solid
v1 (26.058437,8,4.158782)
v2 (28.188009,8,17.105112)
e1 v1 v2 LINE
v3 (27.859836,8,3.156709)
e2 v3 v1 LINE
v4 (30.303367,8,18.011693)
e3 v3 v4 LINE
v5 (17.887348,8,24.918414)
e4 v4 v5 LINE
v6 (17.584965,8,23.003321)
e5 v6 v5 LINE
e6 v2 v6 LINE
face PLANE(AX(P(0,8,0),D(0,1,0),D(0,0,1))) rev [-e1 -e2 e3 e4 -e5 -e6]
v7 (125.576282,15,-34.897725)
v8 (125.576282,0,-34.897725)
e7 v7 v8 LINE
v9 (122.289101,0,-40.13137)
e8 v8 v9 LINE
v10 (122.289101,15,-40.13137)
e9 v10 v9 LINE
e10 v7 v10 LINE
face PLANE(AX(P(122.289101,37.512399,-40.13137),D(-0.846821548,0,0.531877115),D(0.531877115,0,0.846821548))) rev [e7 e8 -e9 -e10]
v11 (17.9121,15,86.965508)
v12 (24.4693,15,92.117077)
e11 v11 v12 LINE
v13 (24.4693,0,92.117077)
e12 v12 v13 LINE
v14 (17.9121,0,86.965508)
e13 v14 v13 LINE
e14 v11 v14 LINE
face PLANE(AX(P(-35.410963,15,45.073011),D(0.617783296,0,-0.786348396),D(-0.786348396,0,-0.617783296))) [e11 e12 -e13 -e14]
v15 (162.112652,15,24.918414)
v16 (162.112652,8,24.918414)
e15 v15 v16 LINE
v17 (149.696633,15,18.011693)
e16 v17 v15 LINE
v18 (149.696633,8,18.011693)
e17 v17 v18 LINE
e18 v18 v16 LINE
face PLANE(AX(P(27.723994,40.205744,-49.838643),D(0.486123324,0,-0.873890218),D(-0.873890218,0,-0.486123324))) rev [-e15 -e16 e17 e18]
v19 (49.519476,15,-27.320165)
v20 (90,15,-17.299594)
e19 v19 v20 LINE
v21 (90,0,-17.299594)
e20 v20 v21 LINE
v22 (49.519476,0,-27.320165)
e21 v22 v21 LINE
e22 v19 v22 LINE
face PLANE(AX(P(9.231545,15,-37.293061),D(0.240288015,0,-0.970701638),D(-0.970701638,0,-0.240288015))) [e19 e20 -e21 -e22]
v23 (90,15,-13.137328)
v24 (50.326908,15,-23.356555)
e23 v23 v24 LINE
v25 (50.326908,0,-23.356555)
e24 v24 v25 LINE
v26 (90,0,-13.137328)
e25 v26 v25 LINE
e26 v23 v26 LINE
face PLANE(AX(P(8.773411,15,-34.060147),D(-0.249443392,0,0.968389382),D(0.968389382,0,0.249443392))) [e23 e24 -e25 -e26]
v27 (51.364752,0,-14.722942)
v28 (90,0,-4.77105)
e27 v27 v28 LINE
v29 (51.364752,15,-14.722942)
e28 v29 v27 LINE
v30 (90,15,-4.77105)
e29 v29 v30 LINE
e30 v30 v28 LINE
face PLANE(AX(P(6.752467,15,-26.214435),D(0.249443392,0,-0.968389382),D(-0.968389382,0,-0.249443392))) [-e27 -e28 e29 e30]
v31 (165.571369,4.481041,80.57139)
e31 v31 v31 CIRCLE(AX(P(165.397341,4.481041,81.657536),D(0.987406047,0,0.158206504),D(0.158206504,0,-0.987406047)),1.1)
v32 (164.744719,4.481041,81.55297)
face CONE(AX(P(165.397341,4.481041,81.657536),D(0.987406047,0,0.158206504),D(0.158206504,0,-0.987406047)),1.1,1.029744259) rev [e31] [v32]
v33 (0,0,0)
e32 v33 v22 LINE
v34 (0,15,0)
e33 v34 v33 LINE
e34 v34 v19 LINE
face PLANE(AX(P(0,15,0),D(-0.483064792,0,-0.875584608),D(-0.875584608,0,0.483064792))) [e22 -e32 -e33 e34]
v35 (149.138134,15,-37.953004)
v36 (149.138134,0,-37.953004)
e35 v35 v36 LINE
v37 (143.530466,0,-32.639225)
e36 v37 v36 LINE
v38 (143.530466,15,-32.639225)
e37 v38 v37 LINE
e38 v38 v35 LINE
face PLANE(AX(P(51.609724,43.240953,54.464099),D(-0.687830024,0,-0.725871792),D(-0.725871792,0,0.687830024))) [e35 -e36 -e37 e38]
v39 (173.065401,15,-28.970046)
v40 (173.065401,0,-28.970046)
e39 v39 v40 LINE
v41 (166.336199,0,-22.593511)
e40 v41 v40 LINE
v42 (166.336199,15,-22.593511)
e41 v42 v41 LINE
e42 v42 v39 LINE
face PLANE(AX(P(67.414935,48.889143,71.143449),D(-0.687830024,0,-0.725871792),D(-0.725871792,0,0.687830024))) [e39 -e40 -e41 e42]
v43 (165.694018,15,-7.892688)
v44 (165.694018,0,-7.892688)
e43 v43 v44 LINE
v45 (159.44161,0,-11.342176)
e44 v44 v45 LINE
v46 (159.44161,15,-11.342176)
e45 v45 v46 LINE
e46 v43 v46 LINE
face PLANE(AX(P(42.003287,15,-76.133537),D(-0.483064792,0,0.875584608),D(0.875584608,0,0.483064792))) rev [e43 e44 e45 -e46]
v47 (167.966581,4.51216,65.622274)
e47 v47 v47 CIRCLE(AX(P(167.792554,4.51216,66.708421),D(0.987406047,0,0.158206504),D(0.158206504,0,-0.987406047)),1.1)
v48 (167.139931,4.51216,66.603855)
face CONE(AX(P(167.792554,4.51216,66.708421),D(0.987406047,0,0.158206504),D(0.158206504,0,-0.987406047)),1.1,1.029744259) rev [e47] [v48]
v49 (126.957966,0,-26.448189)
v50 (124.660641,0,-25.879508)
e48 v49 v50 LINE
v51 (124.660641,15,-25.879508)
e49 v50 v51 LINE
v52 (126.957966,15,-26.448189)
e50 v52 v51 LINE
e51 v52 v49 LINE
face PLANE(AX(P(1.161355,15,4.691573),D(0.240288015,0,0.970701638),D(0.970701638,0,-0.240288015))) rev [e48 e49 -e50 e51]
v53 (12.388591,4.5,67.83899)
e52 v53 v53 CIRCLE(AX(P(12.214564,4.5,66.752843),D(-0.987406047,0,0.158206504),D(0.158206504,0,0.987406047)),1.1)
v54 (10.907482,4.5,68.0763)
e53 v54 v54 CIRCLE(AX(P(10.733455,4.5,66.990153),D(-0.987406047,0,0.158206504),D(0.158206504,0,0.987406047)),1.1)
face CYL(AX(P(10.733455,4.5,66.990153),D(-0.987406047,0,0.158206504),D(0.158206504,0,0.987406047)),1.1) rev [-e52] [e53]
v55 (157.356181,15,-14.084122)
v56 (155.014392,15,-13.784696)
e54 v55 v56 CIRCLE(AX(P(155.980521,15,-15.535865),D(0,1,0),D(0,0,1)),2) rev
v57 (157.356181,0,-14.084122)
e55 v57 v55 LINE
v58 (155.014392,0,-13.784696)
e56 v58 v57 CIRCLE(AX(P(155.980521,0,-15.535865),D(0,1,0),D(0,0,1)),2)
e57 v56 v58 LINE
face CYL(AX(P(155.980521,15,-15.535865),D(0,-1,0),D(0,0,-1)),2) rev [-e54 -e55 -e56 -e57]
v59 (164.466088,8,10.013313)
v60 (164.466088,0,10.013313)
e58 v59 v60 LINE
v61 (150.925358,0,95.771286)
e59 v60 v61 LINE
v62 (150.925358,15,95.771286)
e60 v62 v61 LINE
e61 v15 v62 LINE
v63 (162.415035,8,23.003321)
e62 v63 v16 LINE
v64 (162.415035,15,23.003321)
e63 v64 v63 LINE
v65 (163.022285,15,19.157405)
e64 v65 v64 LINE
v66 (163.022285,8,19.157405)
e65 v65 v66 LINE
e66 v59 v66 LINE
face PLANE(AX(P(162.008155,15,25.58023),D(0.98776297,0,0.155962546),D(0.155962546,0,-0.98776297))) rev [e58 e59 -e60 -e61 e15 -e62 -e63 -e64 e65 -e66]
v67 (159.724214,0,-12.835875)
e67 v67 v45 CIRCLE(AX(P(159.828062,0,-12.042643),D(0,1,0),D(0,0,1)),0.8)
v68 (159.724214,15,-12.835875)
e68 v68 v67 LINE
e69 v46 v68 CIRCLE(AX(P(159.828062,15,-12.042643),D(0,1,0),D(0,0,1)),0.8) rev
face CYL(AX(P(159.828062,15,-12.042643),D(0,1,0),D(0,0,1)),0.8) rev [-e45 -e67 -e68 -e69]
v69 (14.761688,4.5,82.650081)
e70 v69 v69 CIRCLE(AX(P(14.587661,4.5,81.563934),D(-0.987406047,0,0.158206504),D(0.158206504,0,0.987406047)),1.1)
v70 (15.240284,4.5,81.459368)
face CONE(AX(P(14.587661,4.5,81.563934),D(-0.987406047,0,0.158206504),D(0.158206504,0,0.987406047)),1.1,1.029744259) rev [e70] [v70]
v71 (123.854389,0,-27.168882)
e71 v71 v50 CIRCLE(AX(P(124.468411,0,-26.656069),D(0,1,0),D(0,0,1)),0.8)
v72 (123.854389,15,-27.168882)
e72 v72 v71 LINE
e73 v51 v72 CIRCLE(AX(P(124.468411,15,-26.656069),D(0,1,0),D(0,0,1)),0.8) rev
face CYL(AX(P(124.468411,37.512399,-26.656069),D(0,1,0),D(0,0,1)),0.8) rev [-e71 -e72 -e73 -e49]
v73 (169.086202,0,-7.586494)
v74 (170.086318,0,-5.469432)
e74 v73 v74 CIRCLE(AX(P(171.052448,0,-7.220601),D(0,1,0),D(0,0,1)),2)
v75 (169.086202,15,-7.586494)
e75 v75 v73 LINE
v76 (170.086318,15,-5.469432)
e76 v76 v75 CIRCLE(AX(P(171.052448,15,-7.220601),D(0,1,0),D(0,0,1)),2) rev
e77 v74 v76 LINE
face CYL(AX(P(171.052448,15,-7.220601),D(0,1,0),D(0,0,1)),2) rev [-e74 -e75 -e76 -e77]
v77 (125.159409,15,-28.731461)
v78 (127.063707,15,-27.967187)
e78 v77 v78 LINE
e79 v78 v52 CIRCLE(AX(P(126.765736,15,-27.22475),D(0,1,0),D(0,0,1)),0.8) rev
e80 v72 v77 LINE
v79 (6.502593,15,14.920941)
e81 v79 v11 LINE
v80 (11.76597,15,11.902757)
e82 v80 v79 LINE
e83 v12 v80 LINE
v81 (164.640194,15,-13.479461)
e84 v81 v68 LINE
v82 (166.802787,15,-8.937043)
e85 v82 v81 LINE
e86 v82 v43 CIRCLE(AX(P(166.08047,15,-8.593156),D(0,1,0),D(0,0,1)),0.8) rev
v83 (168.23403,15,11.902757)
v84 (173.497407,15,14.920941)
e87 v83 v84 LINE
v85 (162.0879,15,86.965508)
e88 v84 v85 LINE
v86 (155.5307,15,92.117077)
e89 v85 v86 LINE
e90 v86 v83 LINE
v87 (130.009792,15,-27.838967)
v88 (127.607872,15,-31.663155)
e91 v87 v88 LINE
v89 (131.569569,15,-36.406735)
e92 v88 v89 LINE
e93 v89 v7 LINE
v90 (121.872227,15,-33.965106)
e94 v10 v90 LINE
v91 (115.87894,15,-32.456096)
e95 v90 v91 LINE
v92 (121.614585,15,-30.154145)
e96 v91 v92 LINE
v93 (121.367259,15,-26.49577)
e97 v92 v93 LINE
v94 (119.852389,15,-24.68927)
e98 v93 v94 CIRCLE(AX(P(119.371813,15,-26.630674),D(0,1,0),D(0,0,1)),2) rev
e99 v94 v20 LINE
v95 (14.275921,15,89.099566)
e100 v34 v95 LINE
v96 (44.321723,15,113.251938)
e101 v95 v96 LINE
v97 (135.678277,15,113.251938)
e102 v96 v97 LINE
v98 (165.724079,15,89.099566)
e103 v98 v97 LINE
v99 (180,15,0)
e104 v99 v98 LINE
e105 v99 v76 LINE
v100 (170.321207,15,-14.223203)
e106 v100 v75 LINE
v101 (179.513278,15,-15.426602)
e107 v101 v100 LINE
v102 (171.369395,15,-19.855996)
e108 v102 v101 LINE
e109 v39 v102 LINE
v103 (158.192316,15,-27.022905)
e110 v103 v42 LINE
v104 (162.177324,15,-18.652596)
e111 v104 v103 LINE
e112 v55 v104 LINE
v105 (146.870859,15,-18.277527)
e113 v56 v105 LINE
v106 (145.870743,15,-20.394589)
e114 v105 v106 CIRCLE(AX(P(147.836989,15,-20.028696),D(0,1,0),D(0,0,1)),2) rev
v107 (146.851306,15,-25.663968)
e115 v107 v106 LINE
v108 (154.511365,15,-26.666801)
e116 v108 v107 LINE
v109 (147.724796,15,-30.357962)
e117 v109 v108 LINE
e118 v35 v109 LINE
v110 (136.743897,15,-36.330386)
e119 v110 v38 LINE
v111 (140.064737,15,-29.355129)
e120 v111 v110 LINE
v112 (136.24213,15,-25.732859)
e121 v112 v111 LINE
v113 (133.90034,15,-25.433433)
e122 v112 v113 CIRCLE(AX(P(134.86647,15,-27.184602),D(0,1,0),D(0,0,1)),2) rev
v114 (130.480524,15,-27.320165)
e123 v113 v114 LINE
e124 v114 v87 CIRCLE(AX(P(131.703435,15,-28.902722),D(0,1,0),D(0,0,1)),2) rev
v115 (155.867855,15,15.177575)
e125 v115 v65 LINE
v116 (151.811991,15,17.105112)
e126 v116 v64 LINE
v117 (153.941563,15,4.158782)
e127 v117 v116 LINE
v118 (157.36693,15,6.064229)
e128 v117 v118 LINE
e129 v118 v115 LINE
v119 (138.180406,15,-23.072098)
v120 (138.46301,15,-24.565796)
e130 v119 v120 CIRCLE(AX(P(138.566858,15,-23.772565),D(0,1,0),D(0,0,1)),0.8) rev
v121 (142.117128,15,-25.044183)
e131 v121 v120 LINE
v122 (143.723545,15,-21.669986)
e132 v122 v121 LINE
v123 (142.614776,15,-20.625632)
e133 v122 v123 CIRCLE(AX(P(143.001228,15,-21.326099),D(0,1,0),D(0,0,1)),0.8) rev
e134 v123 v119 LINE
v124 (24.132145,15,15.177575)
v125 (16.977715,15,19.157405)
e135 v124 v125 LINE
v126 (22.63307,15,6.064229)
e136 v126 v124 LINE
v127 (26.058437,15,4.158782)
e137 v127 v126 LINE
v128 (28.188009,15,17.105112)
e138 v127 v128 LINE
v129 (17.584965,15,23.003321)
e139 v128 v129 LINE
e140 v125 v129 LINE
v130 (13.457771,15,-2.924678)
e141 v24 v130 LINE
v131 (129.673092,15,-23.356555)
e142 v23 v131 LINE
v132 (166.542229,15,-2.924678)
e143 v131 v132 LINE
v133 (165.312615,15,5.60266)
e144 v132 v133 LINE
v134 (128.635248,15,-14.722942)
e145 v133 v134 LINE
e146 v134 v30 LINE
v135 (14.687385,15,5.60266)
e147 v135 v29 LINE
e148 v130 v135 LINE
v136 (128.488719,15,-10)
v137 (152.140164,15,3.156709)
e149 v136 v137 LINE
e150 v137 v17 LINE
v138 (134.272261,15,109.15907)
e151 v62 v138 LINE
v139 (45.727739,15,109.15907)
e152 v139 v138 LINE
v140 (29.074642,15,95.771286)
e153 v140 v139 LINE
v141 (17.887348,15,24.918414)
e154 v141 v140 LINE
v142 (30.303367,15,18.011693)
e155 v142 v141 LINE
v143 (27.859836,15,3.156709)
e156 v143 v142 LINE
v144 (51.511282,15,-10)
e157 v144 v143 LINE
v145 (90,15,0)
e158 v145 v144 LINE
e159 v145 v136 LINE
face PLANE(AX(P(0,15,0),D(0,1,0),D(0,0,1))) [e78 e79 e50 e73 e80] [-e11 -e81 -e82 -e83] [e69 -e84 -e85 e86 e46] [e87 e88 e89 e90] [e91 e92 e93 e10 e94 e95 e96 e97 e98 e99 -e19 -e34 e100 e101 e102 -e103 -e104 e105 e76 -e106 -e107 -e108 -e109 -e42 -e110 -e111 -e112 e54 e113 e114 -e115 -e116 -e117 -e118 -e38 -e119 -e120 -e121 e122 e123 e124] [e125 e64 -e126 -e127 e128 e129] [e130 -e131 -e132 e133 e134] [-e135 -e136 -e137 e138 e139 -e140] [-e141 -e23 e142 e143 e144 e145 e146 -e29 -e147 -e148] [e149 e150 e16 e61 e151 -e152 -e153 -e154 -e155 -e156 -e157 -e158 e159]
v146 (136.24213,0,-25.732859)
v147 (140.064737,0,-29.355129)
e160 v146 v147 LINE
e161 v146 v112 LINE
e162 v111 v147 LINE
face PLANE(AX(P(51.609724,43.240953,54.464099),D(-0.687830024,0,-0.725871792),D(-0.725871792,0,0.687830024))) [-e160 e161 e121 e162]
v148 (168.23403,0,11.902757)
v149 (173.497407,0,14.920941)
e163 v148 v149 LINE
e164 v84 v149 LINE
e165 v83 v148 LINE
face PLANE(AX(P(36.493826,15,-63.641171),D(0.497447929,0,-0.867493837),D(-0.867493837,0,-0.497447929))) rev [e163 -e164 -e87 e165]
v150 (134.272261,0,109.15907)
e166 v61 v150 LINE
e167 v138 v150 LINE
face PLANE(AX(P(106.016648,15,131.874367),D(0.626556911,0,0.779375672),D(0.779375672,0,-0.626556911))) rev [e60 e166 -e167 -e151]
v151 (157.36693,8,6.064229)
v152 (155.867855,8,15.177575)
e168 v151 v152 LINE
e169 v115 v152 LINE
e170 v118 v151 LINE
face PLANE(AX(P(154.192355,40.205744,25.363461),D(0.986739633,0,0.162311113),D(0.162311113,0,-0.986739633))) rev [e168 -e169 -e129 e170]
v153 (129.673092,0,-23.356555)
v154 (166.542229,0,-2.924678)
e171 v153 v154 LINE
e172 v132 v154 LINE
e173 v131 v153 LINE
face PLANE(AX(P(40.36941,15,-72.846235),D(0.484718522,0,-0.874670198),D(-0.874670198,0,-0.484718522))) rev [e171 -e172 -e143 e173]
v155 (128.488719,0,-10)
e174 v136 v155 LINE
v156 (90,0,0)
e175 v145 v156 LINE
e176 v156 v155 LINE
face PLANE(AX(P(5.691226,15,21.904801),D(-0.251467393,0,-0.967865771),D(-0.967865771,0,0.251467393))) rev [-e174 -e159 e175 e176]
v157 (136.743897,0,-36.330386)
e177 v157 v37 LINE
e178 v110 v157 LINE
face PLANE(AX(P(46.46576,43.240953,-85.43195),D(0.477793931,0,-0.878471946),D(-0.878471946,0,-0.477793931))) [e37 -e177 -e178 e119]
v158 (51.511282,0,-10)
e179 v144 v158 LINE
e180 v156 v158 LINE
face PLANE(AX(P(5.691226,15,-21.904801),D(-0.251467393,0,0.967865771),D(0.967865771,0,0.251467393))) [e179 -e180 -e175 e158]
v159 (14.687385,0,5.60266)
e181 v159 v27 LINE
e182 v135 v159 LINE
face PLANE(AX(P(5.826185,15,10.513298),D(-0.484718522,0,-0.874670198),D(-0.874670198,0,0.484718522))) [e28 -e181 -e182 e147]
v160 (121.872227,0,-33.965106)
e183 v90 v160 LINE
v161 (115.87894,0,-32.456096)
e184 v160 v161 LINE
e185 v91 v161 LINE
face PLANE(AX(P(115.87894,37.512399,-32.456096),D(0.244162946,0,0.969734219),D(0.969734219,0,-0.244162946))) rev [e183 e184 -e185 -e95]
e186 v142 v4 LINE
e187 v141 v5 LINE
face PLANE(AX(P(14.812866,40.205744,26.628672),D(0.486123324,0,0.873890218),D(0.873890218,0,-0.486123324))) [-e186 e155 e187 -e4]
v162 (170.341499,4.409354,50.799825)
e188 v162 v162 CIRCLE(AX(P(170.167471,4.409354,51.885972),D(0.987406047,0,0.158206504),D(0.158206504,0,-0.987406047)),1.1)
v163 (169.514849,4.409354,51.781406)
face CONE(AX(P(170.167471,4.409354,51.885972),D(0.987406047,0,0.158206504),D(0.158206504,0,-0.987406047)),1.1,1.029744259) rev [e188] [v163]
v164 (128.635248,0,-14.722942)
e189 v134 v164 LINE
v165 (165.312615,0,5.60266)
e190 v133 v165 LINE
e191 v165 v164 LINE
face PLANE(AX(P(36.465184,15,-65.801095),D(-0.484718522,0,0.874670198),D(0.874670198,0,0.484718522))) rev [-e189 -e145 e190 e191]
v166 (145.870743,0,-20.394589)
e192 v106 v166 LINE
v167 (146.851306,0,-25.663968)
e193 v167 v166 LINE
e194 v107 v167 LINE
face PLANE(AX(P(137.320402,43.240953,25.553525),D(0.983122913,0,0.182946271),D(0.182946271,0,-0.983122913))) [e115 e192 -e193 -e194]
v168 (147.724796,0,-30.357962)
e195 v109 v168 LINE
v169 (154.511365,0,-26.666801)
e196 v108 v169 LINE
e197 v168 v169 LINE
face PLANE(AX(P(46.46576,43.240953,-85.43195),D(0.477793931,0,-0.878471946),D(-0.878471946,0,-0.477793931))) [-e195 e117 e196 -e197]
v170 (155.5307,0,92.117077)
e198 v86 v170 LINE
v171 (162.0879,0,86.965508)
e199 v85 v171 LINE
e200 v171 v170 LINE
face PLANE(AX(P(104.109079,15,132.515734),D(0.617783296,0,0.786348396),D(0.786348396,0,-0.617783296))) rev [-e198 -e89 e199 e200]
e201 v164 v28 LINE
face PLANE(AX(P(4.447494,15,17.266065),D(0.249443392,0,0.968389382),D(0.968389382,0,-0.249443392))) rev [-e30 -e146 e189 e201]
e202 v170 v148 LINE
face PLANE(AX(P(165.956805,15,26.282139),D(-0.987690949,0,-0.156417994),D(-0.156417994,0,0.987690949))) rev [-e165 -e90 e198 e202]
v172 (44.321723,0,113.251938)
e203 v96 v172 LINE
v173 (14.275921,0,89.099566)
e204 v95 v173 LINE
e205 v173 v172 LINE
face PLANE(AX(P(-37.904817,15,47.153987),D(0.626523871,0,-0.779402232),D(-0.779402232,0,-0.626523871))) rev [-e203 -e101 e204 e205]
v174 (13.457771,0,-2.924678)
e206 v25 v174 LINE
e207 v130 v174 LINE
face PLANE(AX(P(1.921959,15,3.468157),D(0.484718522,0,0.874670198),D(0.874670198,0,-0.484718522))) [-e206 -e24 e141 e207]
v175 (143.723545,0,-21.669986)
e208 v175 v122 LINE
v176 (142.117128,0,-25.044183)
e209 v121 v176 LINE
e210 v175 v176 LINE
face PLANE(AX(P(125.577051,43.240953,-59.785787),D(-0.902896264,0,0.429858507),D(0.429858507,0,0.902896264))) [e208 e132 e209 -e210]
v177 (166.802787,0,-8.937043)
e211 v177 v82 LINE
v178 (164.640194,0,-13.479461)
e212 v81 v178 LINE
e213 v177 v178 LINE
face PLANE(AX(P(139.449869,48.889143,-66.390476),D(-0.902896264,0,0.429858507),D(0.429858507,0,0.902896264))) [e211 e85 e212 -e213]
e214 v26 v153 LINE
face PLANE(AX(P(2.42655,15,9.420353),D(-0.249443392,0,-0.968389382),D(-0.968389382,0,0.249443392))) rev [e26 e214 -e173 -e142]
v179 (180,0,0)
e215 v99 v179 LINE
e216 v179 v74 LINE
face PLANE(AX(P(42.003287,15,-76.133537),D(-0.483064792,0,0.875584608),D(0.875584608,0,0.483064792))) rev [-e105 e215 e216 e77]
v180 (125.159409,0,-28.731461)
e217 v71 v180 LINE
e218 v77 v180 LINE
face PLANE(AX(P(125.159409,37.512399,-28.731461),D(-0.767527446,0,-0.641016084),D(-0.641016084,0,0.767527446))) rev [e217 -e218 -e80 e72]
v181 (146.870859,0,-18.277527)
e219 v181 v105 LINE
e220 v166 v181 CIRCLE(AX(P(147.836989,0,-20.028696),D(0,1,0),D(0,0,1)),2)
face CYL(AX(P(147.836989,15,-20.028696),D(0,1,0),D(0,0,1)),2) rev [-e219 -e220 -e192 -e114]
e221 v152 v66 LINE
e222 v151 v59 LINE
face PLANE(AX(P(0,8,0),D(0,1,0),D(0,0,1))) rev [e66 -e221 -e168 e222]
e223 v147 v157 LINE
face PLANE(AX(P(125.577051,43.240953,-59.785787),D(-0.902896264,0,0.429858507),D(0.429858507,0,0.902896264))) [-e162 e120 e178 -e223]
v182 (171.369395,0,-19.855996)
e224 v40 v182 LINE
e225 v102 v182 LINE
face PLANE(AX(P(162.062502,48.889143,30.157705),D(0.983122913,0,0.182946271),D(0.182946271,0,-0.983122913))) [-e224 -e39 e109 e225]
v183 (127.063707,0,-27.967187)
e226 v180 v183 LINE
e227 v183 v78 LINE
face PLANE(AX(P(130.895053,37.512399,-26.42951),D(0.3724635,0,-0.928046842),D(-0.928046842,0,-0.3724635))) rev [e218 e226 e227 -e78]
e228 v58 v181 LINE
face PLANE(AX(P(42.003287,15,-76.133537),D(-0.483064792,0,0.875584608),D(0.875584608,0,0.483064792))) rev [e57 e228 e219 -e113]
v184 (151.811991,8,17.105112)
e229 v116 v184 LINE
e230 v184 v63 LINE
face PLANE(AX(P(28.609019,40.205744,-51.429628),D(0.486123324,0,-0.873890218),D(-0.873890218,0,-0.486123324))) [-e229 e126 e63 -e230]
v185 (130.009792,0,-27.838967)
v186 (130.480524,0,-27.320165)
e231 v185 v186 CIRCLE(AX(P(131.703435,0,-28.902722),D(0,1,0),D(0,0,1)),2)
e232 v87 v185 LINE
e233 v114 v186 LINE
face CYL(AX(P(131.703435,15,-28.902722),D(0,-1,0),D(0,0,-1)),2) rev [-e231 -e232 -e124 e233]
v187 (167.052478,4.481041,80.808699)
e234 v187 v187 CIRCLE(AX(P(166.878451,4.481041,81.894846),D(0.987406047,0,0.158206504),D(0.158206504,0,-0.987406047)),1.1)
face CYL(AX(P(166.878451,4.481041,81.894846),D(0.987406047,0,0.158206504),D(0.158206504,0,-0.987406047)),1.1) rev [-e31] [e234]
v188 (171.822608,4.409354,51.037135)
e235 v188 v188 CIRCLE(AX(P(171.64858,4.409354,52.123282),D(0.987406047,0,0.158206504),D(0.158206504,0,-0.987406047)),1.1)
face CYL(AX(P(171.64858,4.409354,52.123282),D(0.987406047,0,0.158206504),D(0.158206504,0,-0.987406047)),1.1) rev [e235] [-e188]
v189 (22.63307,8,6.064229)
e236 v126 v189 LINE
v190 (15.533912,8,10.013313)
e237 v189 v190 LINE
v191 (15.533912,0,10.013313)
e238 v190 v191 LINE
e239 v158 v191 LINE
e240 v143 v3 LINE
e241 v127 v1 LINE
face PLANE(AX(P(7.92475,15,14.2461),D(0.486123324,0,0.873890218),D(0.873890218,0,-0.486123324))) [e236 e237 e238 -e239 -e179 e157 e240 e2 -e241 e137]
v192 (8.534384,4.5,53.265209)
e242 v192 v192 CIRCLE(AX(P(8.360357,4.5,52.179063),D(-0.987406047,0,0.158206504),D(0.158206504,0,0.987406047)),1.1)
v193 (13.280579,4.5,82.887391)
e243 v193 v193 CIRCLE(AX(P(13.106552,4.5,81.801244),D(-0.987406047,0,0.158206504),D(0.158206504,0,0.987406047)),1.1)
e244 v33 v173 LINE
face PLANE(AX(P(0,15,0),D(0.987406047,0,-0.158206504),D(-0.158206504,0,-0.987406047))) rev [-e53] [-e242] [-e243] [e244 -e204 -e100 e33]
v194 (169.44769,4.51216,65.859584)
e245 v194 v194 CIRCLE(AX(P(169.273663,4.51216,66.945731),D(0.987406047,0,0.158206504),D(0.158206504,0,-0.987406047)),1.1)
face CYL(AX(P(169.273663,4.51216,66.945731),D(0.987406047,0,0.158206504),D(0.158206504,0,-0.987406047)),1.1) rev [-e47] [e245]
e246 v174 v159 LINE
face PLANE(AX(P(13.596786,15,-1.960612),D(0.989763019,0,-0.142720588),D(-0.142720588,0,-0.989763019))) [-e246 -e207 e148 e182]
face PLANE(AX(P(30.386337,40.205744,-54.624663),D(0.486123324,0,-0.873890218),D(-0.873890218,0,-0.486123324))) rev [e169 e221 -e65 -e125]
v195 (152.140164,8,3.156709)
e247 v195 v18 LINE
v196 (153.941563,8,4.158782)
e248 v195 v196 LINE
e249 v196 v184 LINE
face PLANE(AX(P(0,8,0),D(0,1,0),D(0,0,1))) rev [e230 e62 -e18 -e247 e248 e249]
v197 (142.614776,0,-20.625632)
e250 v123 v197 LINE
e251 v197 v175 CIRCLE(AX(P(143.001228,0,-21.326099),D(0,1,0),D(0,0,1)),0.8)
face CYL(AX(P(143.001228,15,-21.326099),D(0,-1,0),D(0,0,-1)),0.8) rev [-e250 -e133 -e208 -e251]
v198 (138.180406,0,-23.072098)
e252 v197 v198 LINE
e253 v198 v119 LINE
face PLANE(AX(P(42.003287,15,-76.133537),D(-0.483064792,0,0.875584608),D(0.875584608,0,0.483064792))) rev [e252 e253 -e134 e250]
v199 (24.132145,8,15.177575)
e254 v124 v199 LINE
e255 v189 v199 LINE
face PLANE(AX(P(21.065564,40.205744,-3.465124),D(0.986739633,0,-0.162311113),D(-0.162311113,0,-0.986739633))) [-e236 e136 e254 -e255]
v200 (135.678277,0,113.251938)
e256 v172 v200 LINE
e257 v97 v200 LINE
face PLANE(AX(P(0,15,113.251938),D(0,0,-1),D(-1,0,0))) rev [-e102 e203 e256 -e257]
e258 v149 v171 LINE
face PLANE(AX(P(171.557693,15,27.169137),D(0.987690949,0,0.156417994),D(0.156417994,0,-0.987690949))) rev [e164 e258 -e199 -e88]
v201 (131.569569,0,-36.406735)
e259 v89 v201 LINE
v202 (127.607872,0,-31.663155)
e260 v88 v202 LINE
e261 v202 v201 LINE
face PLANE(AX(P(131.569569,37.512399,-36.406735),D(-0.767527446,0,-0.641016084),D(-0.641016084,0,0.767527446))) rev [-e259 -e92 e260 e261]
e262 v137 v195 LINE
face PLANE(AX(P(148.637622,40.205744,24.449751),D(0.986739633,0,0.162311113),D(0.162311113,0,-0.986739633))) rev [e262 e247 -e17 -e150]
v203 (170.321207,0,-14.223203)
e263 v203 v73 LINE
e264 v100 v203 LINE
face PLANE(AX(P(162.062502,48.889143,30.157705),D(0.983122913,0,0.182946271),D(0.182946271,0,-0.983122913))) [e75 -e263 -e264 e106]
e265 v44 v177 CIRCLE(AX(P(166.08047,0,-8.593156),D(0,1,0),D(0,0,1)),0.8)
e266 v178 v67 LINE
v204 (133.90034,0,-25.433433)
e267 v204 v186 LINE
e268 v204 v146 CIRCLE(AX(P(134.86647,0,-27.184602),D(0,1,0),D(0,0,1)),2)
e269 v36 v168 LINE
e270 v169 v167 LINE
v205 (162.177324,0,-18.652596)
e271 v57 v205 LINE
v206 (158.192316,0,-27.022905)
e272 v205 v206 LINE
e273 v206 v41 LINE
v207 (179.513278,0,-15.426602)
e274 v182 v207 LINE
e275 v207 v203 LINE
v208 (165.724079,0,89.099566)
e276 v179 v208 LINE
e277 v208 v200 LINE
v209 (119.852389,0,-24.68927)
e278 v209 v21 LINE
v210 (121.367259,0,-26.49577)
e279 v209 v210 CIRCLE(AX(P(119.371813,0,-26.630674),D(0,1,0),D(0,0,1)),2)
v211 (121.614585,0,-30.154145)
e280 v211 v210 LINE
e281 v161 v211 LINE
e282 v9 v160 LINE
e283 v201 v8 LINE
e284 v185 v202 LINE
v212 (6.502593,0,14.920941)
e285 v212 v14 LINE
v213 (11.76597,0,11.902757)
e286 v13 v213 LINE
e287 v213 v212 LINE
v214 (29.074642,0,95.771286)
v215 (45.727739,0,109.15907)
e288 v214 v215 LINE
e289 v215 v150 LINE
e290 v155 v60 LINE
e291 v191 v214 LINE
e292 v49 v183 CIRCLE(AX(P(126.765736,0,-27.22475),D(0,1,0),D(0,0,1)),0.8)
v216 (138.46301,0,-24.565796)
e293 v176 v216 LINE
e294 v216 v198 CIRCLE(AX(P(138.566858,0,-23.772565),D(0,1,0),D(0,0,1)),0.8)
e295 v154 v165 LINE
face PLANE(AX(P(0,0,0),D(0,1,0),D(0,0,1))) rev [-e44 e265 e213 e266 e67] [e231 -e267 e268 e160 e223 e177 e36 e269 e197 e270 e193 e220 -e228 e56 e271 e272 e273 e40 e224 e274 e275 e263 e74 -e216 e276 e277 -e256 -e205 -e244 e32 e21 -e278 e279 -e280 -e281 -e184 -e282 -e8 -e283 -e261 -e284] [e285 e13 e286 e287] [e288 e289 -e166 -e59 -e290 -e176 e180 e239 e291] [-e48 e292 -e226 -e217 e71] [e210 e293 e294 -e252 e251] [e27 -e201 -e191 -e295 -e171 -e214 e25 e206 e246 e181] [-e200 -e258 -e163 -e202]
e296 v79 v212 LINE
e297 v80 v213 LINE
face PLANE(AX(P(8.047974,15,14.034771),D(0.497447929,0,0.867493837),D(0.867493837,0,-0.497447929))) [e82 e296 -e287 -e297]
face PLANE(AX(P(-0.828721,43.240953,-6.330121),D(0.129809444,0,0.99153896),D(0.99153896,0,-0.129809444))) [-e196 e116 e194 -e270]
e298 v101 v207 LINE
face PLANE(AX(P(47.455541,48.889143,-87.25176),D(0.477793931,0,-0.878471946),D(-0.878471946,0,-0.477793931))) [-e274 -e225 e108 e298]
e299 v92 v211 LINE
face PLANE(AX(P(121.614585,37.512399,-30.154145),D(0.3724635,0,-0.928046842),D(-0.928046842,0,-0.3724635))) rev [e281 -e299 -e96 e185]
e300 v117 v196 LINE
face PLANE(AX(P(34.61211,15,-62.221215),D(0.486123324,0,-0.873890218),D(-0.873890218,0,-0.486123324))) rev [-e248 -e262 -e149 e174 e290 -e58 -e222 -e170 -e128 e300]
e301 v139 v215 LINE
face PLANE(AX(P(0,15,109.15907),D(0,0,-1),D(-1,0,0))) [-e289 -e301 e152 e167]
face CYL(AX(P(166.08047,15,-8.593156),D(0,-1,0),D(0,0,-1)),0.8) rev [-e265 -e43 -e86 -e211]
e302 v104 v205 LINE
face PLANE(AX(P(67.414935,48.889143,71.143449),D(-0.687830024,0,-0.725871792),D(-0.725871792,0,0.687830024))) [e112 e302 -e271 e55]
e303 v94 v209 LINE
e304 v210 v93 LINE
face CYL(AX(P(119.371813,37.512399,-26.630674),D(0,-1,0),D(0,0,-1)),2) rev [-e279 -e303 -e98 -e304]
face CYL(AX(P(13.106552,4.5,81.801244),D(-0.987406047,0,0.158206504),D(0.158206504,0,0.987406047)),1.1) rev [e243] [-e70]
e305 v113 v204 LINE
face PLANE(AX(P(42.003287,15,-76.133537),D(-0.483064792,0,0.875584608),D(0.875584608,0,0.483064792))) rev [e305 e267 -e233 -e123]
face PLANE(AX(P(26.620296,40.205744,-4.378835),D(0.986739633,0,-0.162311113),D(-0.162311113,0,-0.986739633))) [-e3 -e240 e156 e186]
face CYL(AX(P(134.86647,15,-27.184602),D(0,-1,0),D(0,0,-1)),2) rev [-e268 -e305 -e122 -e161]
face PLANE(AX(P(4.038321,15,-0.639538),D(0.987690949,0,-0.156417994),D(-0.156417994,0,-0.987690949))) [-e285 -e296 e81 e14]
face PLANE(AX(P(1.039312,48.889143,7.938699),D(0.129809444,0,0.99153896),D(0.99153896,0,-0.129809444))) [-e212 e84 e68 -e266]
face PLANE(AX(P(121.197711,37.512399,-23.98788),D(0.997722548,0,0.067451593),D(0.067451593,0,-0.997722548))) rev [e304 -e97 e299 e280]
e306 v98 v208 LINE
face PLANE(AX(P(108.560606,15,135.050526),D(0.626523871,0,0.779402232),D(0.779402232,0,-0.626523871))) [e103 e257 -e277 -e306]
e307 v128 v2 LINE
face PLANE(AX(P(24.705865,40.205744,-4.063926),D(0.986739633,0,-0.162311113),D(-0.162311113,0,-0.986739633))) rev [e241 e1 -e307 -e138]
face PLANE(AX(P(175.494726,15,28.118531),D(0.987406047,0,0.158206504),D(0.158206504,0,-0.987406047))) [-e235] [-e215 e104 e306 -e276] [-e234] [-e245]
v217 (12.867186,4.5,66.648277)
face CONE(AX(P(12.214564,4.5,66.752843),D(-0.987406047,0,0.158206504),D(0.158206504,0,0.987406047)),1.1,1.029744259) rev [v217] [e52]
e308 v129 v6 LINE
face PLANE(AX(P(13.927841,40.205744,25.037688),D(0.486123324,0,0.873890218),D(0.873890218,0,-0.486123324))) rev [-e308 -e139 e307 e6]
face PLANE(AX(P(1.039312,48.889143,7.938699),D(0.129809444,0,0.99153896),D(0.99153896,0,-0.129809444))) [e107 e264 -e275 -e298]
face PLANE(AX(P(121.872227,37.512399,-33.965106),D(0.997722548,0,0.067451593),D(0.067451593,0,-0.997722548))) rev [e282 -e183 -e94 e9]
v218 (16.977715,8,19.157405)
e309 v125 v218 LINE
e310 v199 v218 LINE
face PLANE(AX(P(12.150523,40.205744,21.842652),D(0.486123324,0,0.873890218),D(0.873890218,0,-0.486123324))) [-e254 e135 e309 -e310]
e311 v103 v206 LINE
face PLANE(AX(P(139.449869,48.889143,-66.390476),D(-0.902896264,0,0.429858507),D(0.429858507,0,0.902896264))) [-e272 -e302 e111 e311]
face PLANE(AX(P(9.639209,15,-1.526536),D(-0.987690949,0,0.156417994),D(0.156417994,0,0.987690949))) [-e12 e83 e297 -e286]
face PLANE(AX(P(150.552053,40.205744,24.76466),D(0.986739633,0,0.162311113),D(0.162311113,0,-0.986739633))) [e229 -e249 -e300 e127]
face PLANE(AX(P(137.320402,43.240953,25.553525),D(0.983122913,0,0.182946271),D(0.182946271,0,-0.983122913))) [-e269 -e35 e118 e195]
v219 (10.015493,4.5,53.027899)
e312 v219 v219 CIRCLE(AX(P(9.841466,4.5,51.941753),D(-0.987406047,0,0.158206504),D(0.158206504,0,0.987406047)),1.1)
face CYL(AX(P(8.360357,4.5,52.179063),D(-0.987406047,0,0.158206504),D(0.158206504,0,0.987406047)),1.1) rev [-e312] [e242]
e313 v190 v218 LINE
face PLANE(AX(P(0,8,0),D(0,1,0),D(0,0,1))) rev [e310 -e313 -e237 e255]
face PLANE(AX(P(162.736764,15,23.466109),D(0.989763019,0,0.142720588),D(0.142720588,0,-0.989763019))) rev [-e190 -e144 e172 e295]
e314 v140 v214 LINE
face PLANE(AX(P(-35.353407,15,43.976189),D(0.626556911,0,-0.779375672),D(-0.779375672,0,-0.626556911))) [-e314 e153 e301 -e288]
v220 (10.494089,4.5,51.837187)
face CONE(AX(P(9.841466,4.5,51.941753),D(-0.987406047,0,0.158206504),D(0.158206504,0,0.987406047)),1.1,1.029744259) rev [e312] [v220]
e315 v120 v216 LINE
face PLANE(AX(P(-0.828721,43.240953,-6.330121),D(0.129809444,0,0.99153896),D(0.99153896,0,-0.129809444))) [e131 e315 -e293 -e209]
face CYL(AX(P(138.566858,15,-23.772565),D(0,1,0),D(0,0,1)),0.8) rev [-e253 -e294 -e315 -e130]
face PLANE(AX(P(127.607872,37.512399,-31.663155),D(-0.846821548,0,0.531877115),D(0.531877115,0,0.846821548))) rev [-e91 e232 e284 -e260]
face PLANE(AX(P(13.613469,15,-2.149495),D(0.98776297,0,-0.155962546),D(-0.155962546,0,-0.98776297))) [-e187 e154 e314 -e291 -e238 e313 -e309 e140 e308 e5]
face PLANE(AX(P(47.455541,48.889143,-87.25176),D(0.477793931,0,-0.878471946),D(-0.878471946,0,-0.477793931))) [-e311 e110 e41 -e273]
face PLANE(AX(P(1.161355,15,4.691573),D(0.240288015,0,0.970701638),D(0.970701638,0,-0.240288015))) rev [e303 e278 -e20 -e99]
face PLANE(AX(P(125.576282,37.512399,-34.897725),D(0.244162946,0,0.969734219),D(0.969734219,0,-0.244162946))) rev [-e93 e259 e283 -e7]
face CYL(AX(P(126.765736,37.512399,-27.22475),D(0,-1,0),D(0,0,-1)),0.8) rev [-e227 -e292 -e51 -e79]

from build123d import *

# Parameters (mm, degrees)
EXTRUDE_1_DEPTH = 15
EXTRUDE_START   = 8
EXTRUDE_3_DEPTH = 7
EXTRUDE_4_DEPTH = 15
EXTRUDE_5_DEPTH = 15
EXTRUDE_6_DEPTH = 15
FILLET_1_R      = 2
FILLET_2_R      = 0.8
F_2_0MM_1_D     = 2.2
F_2_0MM_1_DEPTH = 1.5
F_2_0MM_1_TIP   = 0.660946681
F_2_0MM_2_D     = 2.2
F_2_0MM_2_DEPTH = 1.5
F_2_0MM_2_TIP   = 0.660946681


with BuildPart() as part:
    # 草图1 → 凸台-拉伸1 (new body)
    with BuildSketch(Plane(origin=(0, 0, 0), x_dir=(1, 0, 0), z_dir=(0, 1, 0))):
        Polygon((49.5194763, 27.3201645), (0, 0), (14.2759212, -89.0995664), (44.3217232, -113.2519378), (135.6782768, -113.2519378), (165.7240788, -89.0995664), (180, 0), (130.4805237, 27.3201645), (90, 17.2995935), align=None)
        Polygon((6.502592683, -14.920940874), (11.7659704, -11.9027565), (24.4692995, -92.1170773), (17.9120995, -86.965507524), align=None, mode=Mode.SUBTRACT)
        Polygon((51.5112815, 10), (90, 0), (128.4887185, 10), (152.140164487, -3.156709279), (153.941562556, -4.158782079), (157.3669305, -6.0642288), (164.466088374, -10.013313195), (163.0222846, -19.1574054), (162.41503493, -23.003320662), (162.112651759, -24.918414423), (150.9253582, -95.7712863), (134.2722611, -109.1590702), (45.7277389, -109.1590702), (29.0746418, -95.7712863), (17.887348241, -24.918414423), (17.58496507, -23.003320662), (16.9777154, -19.1574054), (15.533911626, -10.013313195), (22.6330695, -6.0642288), (26.058437444, -4.158782079), (27.859835513, -3.156709279), align=None, mode=Mode.SUBTRACT)
        Polygon((162.0879005, -86.965507524), (155.5307005, -92.1170773), (168.2340296, -11.9027565), (173.497407317, -14.920940874), align=None, mode=Mode.SUBTRACT)
        Polygon((50.326908, 23.3565545), (90, 13.1373278), (129.673092, 23.3565545), (166.5422291, 2.924677806), (165.312614852, -5.602660324), (128.635248263, 14.72294235), (90, 4.7710495), (51.364751737, 14.72294235), (14.687385148, -5.602660324), (13.4577709, 2.924677806), align=None, mode=Mode.SUBTRACT)
    extrude(amount=EXTRUDE_1_DEPTH)

    # 草图1<4> → 凸台-拉伸3 (add)
    with BuildSketch(Plane(origin=(0, 0, 0), x_dir=(1, 0, 0), z_dir=(0, 1, 0)).offset(EXTRUDE_START)):
        Polygon((164.466088374, -10.013313195), (163.0222846, -19.1574054), (155.8678549, -15.177574667), (157.3669305, -6.0642288), align=None)
        Polygon((153.941562556, -4.158782079), (152.140164487, -3.156709279), (149.6966334, -18.0116932), (162.112651759, -24.918414423), (162.41503493, -23.003320662), (151.8119905, -17.1051116), align=None)
        Polygon((22.6330695, -6.0642288), (15.533911626, -10.013313195), (16.9777154, -19.1574054), (24.1321451, -15.177574667), align=None)
        Polygon((30.3033666, -18.0116932), (27.859835513, -3.156709279), (26.058437444, -4.158782079), (28.1880095, -17.1051116), (17.58496507, -23.003320662), (17.887348241, -24.918414423), align=None)
    extrude(amount=EXTRUDE_3_DEPTH)

    # 草图3 → 凸台-拉伸4 (add)
    with BuildSketch(Plane(origin=(0, 0, 0), x_dir=(1, 0, 0), z_dir=(0, 1, 0))):
        Polygon((115.878940082, 32.456095876), (121.872227157, 33.965105872), (122.289100924, 40.131370332), (125.576282273, 34.897725339), (131.569569347, 36.406735336), (127.607872073, 31.663154849), (130.895053422, 26.429509857), (125.159408505, 28.73146088), (121.197711231, 23.987880393), (121.614584999, 30.154144853), align=None)
    extrude(amount=EXTRUDE_4_DEPTH)

    # 草图4 → 凸台-拉伸5 (add)
    with BuildSketch(Plane(origin=(0, 0, 0), x_dir=(1, 0, 0), z_dir=(0, 1, 0))):
        Polygon((168.625201424, 5.109151957), (158.192316311, 27.022904619), (179.513278304, 15.426602313), (155.448122239, 12.276060926), (173.065400703, 28.970046279), align=None)
        Polygon((173.065400703, 28.970046279), (166.336199119, 22.593511282), (171.369395495, 19.85599565), align=None)
        Polygon((179.513278304, 15.426602313), (171.369395495, 19.85599565), (170.321206632, 14.223202586), align=None)
        Polygon((170.321206632, 14.223202586), (164.640193911, 13.479460653), (168.625201424, 5.109151957), align=None)
        Polygon((164.640193911, 13.479460653), (162.177323823, 18.652595923), (155.448122239, 12.276060926), align=None)
        Polygon((166.336199119, 22.593511282), (158.192316311, 27.022904619), (162.177323823, 18.652595923), align=None)
    extrude(amount=EXTRUDE_5_DEPTH)

    # 草图5 → 凸台-拉伸6 (add)
    with BuildSketch(Plane(origin=(0, 0, 0), x_dir=(1, 0, 0), z_dir=(0, 1, 0))):
        Polygon((145.437967888, 18.068925838), (136.74389696, 36.330386388), (154.511365288, 26.666801134), (134.457068567, 24.041349978), (149.138133954, 37.953004439), align=None)
        Polygon((143.530465967, 32.639225275), (136.74389696, 36.330386388), (140.064736554, 29.355129142), align=None)
        Polygon((149.138133954, 37.953004439), (143.530465967, 32.639225275), (147.724796281, 30.357962248), align=None)
        Polygon((154.511365288, 26.666801134), (147.724796281, 30.357962248), (146.851305561, 25.663968028), align=None)
        Polygon((146.851305561, 25.663968028), (142.117128294, 25.044183084), (145.437967888, 18.068925838), align=None)
        Polygon((142.117128294, 25.044183084), (140.064736554, 29.355129142), (134.457068567, 24.041349978), align=None)
    extrude(amount=EXTRUDE_6_DEPTH)

    # 圆角1
    # the kernel refuses this fillet: 2 mm, written as the material it adds along each edge
    with BuildSketch(Plane(origin=(121.268833448, 15, -25.039897652), x_dir=(-0.9707016379334082, 0, 0.2402880149183444), z_dir=(0, -1, 0))) as fillet_1_piece_1:
        with BuildLine():
            CenterArc((FILLET_1_R * 0.72959801192, FILLET_1_R), FILLET_1_R, 197.771167986, 72.228832014)
            Line((-FILLET_1_R * 0.222685090293, FILLET_1_R * 0.69478385816), (-FILLET_1_R * 0.241730752337, FILLET_1_R * 0.688679535323))
            Line((-FILLET_1_R * 0.241730752337, FILLET_1_R * 0.688679535323), (-FILLET_1_R * 0.0145919602384, -FILLET_1_R * 0.02))
            Line((-FILLET_1_R * 0.0145919602384, -FILLET_1_R * 0.02), (FILLET_1_R * 0.72959801192, -FILLET_1_R * 0.02))
            Line((FILLET_1_R * 0.72959801192, -FILLET_1_R * 0.02), (FILLET_1_R * 0.72959801192, 0))
        make_face()
    extrude(amount=15)
    with BuildSketch(Plane(origin=(130.355139653, 0, -27.289126864), x_dir=(-0.5318771148973955, 0, -0.8468215482900885), z_dir=(0, 1, 0))) as fillet_1_piece_2:
        with BuildLine():
            CenterArc((0.649299153, -2), FILLET_1_R, 90, 20.172783533)
            Line((-0.040405567, -0.122686121), (-0.054199661, -0.085139844))
            ThreePointArc((-0.054199661, -0.085139844), (-0.058195374, -0.048830544), (-0.03799259, 0.012512517))
            Line((-0.03799259, 0.012512517), (0, 0.04))
            Line((0, 0.04), (0.649299153, 0.04))
            Line((0.649299153, 0.04), (0.649299153, 0))
        make_face()
    extrude(amount=15)
    with BuildSketch(Plane(origin=(168.822041947, 0, -6.166940275), x_dir=(0.18294627145075168, 0, -0.9831229128457274), z_dir=(0, 1, 0))) as fillet_1_piece_3:
        with BuildLine():
            CenterArc((FILLET_1_R * 0.721961366951, -FILLET_1_R), FILLET_1_R, 90, 71.655658553)
            Line((-FILLET_1_R * 0.227220826301, -FILLET_1_R * 0.685272873726), (-FILLET_1_R * 0.246204470166, -FILLET_1_R * 0.678978331201))
            Line((-FILLET_1_R * 0.246204470166, -FILLET_1_R * 0.678978331201), (-FILLET_1_R * 0.014439227339, FILLET_1_R * 0.02))
            Line((-FILLET_1_R * 0.014439227339, FILLET_1_R * 0.02), (FILLET_1_R * 0.721961366951, FILLET_1_R * 0.02))
            Line((FILLET_1_R * 0.721961366951, FILLET_1_R * 0.02), (FILLET_1_R * 0.721961366951, 0))
        make_face()
    extrude(amount=15)
    with BuildSketch(Plane(origin=(156.29474807, 0, -13.078316465), x_dir=(-0.8755846083755204, 0, -0.4830647923166069), z_dir=(0, 1, 0)), Plane(origin=(135.180696403, 0, -24.727053647), x_dir=(-0.8755846083755225, 0, -0.4830647923166032), z_dir=(0, 1, 0))) as fillet_1_piece_4:
        with BuildLine():
            CenterArc((FILLET_1_R * 0.731143736262, -FILLET_1_R), FILLET_1_R, 90, 72.344341447)
            Line((-FILLET_1_R * 0.221752752158, -FILLET_1_R * 0.696704298814), (-FILLET_1_R * 0.240810681926, -FILLET_1_R * 0.69063838479))
            Line((-FILLET_1_R * 0.240810681926, -FILLET_1_R * 0.69063838479), (-FILLET_1_R * 0.0146228747252, FILLET_1_R * 0.02))
            Line((-FILLET_1_R * 0.0146228747252, FILLET_1_R * 0.02), (FILLET_1_R * 0.731143736262, FILLET_1_R * 0.02))
            Line((FILLET_1_R * 0.731143736262, FILLET_1_R * 0.02), (FILLET_1_R * 0.731143736262, 0))
        make_face()
    extrude(amount=15)
    with BuildSketch(Plane(origin=(145.606582968, 0, -18.975035304), x_dir=(0.8755846083755114, 0, 0.4830647923166232), z_dir=(0, 1, 0))) as fillet_1_piece_5:
        with BuildLine():
            CenterArc((FILLET_1_R * 0.721961366951, FILLET_1_R), FILLET_1_R, 198.344341447, 71.655658553)
            Line((-FILLET_1_R * 0.227220826301, FILLET_1_R * 0.685272873726), (-FILLET_1_R * 0.246204470166, FILLET_1_R * 0.678978331201))
            Line((-FILLET_1_R * 0.246204470166, FILLET_1_R * 0.678978331201), (-FILLET_1_R * 0.014439227339, -FILLET_1_R * 0.02))
            Line((-FILLET_1_R * 0.014439227339, -FILLET_1_R * 0.02), (FILLET_1_R * 0.721961366951, -FILLET_1_R * 0.02))
            Line((FILLET_1_R * 0.721961366951, -FILLET_1_R * 0.02), (FILLET_1_R * 0.721961366951, 0))
        make_face()
    extrude(amount=15)

    # 圆角2
    fillet_2_edges = [part.edges().sort_by_distance(p)[0] for p in [
        (122.286771787, 7.5, -25.291878665),
        (129.364316192, 7.5, -27.043857882),
        (167.872084093, 7.5, -6.691037191),
        (157.30763239, 7.5, -12.519502675),
        (144.792841891, 7.5, -19.423980684),
        (136.046428654, 7.5, -24.249424454),
    ]]
    fillet(fillet_2_edges, radius=FILLET_2_R)

    # Ø2.0mm 暗销孔1
    with Locations(Plane(origin=(0, 0, 0), x_dir=(0.1582065041586212, 0, 0.9874060471973565), z_dir=(-0.9874060471973565, 0, 0.1582065041586212))):
        with Locations((82.844584748, 4.5), (52.844584748, 4.5), (67.844584748, 4.5)):
            Hole(F_2_0MM_1_D / 2, depth=F_2_0MM_1_DEPTH)
            with Locations((0, 0, -(F_2_0MM_1_DEPTH + F_2_0MM_1_TIP / 2))):  # 118° drill point
                Cone(0, F_2_0MM_1_D / 2, F_2_0MM_1_TIP, mode=Mode.SUBTRACT)

    # Ø2.0mm 暗销孔2
    with Locations(Plane(origin=(175.494726368, 0, 28.118530604), x_dir=(0.15820650415862106, 0, -0.9874060471973566), z_dir=(0.9874060471973566, 0, 0.15820650415862106))):
        with Locations((-54.462210035, 4.481040738), (-39.322424853, 4.512160057), (-24.310921517, 4.409353726)):
            Hole(F_2_0MM_2_D / 2, depth=F_2_0MM_2_DEPTH)
            with Locations((0, 0, -(F_2_0MM_2_DEPTH + F_2_0MM_2_TIP / 2))):  # 118° drill point
                Cone(0, F_2_0MM_2_D / 2, F_2_0MM_2_TIP, mode=Mode.SUBTRACT)


solid = part.part
